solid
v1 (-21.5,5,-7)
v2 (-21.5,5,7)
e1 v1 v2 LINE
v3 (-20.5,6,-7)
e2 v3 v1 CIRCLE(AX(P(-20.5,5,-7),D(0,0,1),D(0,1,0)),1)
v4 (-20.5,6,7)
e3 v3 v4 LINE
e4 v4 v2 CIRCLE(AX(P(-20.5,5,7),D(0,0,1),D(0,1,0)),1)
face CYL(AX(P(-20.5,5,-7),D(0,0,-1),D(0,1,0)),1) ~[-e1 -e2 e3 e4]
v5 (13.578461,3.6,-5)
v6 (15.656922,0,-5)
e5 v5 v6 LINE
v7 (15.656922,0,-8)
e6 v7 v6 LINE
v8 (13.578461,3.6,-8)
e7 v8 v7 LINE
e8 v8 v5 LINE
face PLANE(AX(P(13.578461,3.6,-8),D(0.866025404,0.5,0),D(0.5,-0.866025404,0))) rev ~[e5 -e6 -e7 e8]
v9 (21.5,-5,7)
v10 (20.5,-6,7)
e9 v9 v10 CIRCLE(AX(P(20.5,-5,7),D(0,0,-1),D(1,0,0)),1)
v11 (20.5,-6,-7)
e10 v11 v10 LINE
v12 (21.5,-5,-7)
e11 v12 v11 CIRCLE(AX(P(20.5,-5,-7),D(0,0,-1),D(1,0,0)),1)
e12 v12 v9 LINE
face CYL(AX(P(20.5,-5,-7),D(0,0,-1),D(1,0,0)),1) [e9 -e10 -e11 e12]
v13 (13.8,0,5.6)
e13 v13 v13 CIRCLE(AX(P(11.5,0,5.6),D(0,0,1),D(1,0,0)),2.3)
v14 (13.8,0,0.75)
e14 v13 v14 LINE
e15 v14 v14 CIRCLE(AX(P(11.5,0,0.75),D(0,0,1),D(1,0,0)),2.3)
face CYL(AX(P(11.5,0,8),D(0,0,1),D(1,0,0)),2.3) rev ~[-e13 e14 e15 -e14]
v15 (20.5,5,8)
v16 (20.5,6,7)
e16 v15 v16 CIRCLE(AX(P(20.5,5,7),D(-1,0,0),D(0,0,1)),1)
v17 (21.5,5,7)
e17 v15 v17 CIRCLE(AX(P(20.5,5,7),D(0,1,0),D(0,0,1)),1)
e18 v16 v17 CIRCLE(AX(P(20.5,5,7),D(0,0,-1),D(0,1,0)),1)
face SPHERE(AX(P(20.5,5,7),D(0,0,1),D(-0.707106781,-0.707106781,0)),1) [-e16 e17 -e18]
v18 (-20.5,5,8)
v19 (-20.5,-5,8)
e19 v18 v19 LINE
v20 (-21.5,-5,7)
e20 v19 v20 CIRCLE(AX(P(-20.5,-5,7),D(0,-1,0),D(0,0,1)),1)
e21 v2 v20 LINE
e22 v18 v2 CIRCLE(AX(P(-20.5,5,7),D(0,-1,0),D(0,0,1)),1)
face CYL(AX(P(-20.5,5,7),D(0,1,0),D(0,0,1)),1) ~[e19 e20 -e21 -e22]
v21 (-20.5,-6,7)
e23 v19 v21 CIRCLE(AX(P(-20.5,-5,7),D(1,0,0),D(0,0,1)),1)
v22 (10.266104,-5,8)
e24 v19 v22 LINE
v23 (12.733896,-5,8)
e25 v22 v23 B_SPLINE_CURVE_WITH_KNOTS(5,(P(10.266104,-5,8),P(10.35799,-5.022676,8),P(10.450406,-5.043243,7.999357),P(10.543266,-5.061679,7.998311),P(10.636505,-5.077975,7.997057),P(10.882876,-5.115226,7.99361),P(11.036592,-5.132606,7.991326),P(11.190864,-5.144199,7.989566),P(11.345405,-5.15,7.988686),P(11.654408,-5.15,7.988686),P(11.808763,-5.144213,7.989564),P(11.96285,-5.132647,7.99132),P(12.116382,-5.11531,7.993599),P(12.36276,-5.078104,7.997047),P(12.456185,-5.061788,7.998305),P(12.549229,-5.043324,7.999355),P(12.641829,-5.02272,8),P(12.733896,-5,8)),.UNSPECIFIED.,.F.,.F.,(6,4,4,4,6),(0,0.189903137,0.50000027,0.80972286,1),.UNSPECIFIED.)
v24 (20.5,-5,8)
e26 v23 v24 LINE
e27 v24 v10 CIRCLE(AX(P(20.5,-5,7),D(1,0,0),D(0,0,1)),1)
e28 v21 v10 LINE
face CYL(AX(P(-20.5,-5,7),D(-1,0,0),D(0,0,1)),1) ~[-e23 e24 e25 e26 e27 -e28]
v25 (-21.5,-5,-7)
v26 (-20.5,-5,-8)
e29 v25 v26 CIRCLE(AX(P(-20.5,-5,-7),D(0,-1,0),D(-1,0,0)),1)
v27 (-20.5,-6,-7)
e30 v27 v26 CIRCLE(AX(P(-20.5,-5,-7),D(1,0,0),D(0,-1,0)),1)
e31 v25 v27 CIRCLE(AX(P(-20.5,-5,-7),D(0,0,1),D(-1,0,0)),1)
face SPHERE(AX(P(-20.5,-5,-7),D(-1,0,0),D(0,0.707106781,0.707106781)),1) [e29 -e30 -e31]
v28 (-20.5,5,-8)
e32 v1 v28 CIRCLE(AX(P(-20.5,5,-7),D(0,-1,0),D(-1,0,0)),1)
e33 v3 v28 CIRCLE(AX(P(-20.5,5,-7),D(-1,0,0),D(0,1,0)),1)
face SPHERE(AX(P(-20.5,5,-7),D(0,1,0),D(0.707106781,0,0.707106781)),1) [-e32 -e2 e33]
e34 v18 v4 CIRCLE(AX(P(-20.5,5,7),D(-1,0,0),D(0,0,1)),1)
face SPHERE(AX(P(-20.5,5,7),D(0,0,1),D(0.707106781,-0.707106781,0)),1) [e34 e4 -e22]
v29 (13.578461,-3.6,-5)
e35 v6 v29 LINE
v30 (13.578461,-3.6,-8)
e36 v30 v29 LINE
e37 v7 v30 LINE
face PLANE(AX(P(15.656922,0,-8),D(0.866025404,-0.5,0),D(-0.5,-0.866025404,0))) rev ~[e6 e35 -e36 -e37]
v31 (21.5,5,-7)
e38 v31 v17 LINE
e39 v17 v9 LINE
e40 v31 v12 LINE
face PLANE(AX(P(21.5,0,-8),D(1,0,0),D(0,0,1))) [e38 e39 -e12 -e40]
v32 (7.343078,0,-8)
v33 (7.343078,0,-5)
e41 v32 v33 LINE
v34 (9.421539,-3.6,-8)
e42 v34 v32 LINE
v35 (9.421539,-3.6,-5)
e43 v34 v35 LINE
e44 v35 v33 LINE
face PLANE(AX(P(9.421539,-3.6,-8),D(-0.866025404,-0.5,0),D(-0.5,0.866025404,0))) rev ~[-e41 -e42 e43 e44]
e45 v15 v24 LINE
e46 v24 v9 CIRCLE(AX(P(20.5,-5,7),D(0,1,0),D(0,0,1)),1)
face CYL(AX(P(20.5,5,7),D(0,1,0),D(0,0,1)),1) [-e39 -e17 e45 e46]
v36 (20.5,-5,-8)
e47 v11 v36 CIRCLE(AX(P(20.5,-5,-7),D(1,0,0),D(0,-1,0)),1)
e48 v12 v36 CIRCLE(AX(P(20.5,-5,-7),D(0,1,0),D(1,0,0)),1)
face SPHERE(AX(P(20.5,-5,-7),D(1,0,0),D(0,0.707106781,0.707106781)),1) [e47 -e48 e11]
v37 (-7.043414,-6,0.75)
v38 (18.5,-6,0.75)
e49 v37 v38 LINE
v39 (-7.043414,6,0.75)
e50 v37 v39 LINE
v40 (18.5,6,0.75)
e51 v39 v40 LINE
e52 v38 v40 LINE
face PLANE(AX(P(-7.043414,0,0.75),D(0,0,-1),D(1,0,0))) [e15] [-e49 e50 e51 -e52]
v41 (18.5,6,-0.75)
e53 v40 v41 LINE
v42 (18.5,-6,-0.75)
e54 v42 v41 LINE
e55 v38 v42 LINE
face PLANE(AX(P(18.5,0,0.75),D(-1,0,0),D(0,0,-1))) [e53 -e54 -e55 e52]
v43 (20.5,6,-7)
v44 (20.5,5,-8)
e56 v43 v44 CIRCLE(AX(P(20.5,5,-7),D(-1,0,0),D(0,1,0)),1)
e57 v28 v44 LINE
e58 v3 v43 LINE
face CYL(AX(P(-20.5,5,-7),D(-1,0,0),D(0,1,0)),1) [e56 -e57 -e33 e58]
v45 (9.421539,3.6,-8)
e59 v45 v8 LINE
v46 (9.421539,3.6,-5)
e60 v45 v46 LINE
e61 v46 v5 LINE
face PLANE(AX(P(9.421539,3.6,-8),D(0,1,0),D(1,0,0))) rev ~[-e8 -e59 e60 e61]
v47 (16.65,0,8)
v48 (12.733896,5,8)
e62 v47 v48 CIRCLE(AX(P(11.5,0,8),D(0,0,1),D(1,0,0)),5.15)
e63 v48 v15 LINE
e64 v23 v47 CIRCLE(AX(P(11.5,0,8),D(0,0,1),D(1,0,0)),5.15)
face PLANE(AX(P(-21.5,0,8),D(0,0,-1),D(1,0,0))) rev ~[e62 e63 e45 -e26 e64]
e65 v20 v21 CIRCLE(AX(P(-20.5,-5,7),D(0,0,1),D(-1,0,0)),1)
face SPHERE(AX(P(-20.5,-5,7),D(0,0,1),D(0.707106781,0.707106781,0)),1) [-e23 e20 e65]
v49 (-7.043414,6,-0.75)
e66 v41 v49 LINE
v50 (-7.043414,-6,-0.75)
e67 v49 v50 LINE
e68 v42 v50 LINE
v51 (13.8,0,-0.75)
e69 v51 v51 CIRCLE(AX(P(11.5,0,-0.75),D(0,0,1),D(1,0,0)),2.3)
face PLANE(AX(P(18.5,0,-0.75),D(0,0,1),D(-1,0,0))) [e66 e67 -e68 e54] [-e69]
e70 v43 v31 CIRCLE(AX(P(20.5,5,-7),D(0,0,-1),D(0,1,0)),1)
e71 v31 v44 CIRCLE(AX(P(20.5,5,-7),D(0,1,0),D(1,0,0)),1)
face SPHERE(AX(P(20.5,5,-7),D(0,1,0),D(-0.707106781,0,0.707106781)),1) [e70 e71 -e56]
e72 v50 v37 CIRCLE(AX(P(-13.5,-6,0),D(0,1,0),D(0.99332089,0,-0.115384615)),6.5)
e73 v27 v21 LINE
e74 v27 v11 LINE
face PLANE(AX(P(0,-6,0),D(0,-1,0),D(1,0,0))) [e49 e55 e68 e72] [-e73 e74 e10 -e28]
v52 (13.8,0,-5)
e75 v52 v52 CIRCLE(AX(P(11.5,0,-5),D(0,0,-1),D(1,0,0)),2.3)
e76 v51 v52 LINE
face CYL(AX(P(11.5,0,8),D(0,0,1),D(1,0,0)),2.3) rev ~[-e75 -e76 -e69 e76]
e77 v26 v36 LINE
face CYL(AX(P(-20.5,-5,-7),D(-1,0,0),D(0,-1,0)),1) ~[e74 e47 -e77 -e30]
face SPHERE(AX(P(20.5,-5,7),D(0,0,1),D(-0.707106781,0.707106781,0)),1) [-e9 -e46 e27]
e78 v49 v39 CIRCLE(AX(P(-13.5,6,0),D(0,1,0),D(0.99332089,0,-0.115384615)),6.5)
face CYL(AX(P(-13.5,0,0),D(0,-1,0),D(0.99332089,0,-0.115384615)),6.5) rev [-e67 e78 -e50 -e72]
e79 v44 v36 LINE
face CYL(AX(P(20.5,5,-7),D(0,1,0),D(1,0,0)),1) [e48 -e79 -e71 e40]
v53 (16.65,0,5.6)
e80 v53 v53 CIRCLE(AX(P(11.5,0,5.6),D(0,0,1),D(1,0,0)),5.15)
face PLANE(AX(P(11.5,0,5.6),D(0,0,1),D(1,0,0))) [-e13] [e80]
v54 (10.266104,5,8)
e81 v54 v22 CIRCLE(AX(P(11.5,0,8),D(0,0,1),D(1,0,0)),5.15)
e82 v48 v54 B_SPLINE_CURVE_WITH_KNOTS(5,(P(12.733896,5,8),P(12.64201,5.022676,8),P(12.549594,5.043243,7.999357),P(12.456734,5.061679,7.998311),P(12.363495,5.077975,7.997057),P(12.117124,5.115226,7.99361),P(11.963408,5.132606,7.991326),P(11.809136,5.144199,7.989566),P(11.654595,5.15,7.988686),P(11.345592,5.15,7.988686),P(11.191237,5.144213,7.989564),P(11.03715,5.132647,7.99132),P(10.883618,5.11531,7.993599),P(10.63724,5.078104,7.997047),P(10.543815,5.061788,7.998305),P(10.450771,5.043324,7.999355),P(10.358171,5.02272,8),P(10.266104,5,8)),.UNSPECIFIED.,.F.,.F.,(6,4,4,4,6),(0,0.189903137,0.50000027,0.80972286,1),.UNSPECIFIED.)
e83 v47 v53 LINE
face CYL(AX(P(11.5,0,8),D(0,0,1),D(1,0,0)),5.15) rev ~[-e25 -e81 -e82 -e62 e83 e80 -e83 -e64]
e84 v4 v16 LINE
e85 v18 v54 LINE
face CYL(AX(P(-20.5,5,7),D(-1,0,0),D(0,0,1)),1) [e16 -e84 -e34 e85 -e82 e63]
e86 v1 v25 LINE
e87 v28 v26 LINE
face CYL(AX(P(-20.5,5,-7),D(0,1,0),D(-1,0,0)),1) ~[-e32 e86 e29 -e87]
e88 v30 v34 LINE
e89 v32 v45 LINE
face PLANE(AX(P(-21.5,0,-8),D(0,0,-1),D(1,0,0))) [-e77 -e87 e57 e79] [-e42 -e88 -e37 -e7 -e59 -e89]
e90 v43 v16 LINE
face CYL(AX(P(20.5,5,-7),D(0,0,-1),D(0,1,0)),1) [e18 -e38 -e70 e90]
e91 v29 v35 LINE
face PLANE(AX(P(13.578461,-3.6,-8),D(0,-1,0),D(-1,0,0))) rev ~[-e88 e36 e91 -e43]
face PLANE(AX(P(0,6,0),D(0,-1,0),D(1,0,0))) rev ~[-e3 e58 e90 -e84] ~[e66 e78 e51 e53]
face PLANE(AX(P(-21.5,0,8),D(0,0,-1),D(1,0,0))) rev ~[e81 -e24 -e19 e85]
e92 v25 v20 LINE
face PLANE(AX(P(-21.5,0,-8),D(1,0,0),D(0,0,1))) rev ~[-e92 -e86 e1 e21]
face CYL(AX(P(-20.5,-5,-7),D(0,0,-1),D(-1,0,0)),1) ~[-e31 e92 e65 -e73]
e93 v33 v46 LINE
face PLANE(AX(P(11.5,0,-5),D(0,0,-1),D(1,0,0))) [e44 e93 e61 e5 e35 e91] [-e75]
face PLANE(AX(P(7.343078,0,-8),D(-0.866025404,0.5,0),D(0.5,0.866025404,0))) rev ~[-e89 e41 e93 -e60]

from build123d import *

# Parameters (mm, degrees)
F0_W         = 43
F0_H         = 16
F1_DEPTH     = 6
F2_R         = 2.3
F3_DEPTH     = 16
F2_R_2       = 5.15
F4_DEPTH     = 2.4
F5_R         = 2.3
F6_DEPTH     = 3
F7_T1_DEPTH  = 10
F7_T3_DEPTH  = 41
F7_T5_DEPTH  = 14
F7_S9_W      = 1
F7_S9_H      = 1
F7_T10_DEPTH = 1
F7_S15_W     = 1
F7_S15_H     = 1
F7_T16_DEPTH = 1
F7_S21_W     = 1
F7_S21_H     = 1
F7_T22_DEPTH = 1
F7_S27_W     = 1
F7_S27_H     = 1
F7_T28_DEPTH = 1
F7_S33_W     = 1
F7_S33_H     = 1
F7_T34_DEPTH = 1
F7_S39_W     = 1
F7_S39_H     = 1
F7_T40_DEPTH = 1
F7_S45_W     = 1
F7_S45_H     = 1
F7_T46_DEPTH = 1
F7_S51_W     = 1
F7_S51_H     = 1
F7_T52_DEPTH = 1


# Not quite as in the source:
# - a fillet or chamfer that OpenCascade refuses, or shapes differently, is made with other operations: its cross-section is extruded or revolved along the edge and cut away or added


with BuildPart() as f1:
    # F0 (on Front) → F1 (new body, symmetric)
    with BuildSketch(Plane.XZ):
        Rectangle(F0_W, F0_H)
        with BuildLine():
            ThreePointArc((-7.0434142149, -0.75), (-20, 0), (-7.0434142149, 0.75))
            Line((-7.0434142149, 0.75), (18.5, 0.75))
            Line((18.5, 0.75), (18.5, -0.75))
            Line((18.5, -0.75), (-7.0434142149, -0.75))
        make_face(mode=Mode.SUBTRACT)
    extrude(amount=F1_DEPTH, both=True)

    # F2 (on face) → F3 (cut, through all)
    with BuildSketch(Plane.XY.offset(8)):
        with Locations((11.5, 0)):
            Circle(F2_R)
    extrude(amount=-F3_DEPTH, mode=Mode.SUBTRACT)

    # F2 (on face) → F4 (cut)
    with BuildSketch(Plane.XY.offset(8)):
        with Locations((11.5, 0)):
            Circle(F2_R_2)
        with Locations((11.5, 0)):
            Circle(F2_R, mode=Mode.SUBTRACT)
    extrude(amount=-F4_DEPTH, mode=Mode.SUBTRACT)

    # F5 (on face) → F6 (cut)
    with BuildSketch(Plane(origin=(0, 0, -8), x_dir=(1, 0, 0), z_dir=(0, 0, -1))):
        Polygon((13.5784609691, 3.6), (9.4215390309, 3.6), (7.3430780618, 0), (9.4215390309, -3.6), (13.5784609691, -3.6), (15.6569219382, 0), align=None)
        with Locations((11.5, 0)):
            Circle(F5_R, mode=Mode.SUBTRACT)
    extrude(amount=-F6_DEPTH, mode=Mode.SUBTRACT)

    # F7: fillet of radius 1 on 12 edges, made by hand

    # F7_s2 → F7_t1 (cut)
    with BuildSketch(Plane.XZ.offset(-5)):
        with BuildLine():
            ThreePointArc((-21.5, -7), (-21.2071067812, -7.7071067812), (-20.5, -8))
            Line((-20.5, -8), (-21.5, -8))
            Line((-21.5, -8), (-21.5, -7))
        make_face()
        with BuildLine():
            ThreePointArc((21.5, -7), (21.2071067812, -7.7071067812), (20.5, -8))
            Line((20.5, -8), (21.5, -8))
            Line((21.5, -8), (21.5, -7))
        make_face()
        with BuildLine():
            ThreePointArc((-20.5, 8), (-21.2071067812, 7.7071067812), (-21.5, 7))
            Line((-21.5, 7), (-21.5, 8))
            Line((-21.5, 8), (-20.5, 8))
        make_face()
        with BuildLine():
            ThreePointArc((20.5, 8), (21.2071067812, 7.7071067812), (21.5, 7))
            Line((21.5, 7), (21.5, 8))
            Line((21.5, 8), (20.5, 8))
        make_face()
    extrude(amount=F7_T1_DEPTH, mode=Mode.SUBTRACT)

    # F7_s4 → F7_t3 (cut)
    with BuildSketch(Plane.YZ.offset(-20.5)):
        with BuildLine():
            ThreePointArc((-6, -7), (-5.7071067812, -7.7071067812), (-5, -8))
            Line((-5, -8), (-6, -8))
            Line((-6, -8), (-6, -7))
        make_face()
        with BuildLine():
            ThreePointArc((6, -7), (5.7071067812, -7.7071067812), (5, -8))
            Line((5, -8), (6, -8))
            Line((6, -8), (6, -7))
        make_face()
        with BuildLine():
            ThreePointArc((-5, 8), (-5.7071067812, 7.7071067812), (-6, 7))
            Line((-6, 7), (-6, 8))
            Line((-6, 8), (-5, 8))
        make_face()
        with BuildLine():
            ThreePointArc((5, 8), (5.7071067812, 7.7071067812), (6, 7))
            Line((6, 7), (6, 8))
            Line((6, 8), (5, 8))
        make_face()
    extrude(amount=F7_T3_DEPTH, mode=Mode.SUBTRACT)

    # F7_s6 → F7_t5 (cut)
    with BuildSketch(Plane.XY.offset(-7)):
        with BuildLine():
            ThreePointArc((20.5, 6), (21.2071067812, 5.7071067812), (21.5, 5))
            Line((21.5, 5), (21.5, 6))
            Line((21.5, 6), (20.5, 6))
        make_face()
        with BuildLine():
            ThreePointArc((21.5, -5), (21.2071067812, -5.7071067812), (20.5, -6))
            Line((20.5, -6), (21.5, -6))
            Line((21.5, -6), (21.5, -5))
        make_face()
        with BuildLine():
            ThreePointArc((-20.5, 6), (-21.2071067812, 5.7071067812), (-21.5, 5))
            Line((-21.5, 5), (-21.5, 6))
            Line((-21.5, 6), (-20.5, 6))
        make_face()
        with BuildLine():
            ThreePointArc((-21.5, -5), (-21.2071067812, -5.7071067812), (-20.5, -6))
            Line((-20.5, -6), (-21.5, -6))
            Line((-21.5, -6), (-21.5, -5))
        make_face()
    extrude(amount=F7_T5_DEPTH, mode=Mode.SUBTRACT)


with BuildPart() as f7_tool8:
    # F7_s9 → F7_t10 (new body)
    with BuildSketch(Plane.XZ.offset(-5)):
        with Locations((-21, -7.5)):
            Rectangle(F7_S9_W, F7_S9_H)
    extrude(amount=-F7_T10_DEPTH)

    # F7_s11 → F7_t12 (revolve, cut)
    with BuildSketch(Plane(origin=(-20.5, 5, -7), x_dir=(0.7071067812, 0, 0.7071067812), z_dir=(-0.7071067812, 0, 0.7071067812))):
        with BuildLine():
            ThreePointArc((0, -1), (1, 0), (0, 1))
            Line((0, 1), (0, -1))
        make_face()
    revolve(axis=Axis((-20.5, 5, -7), (0, 1, 0)), mode=Mode.SUBTRACT)


with BuildPart() as f1_1:
    add(f1.part)

    # F7_t7: cut F7_tool8
    add(f7_tool8.part, mode=Mode.SUBTRACT)


with BuildPart() as f7_tool14:
    # F7_s15 → F7_t16 (new body)
    with BuildSketch(Plane.YZ.offset(-20.5)):
        with Locations((-5.5, -7.5)):
            Rectangle(F7_S15_W, F7_S15_H)
    extrude(amount=-F7_T16_DEPTH)

    # F7_s17 → F7_t18 (revolve, cut)
    with BuildSketch(Plane(origin=(-20.5, -5, -7), x_dir=(0, 0.7071067812, 0.7071067812), z_dir=(0, -0.7071067812, 0.7071067812))):
        with BuildLine():
            ThreePointArc((0, -1), (1, 0), (0, 1))
            Line((0, 1), (0, -1))
        make_face()
    revolve(axis=Axis((-20.5, -5, -7), (-1, 0, 0)), mode=Mode.SUBTRACT)


with BuildPart() as f1_2:
    add(f1_1.part)

    # F7_t13: cut F7_tool14
    add(f7_tool14.part, mode=Mode.SUBTRACT)


with BuildPart() as f7_tool20:
    # F7_s21 → F7_t22 (new body)
    with BuildSketch(Plane.YZ.offset(20.5)):
        with Locations((-5.5, -7.5)):
            Rectangle(F7_S21_W, F7_S21_H)
    extrude(amount=F7_T22_DEPTH)

    # F7_s23 → F7_t24 (revolve, cut)
    with BuildSketch(Plane(origin=(20.5, -5, -7), x_dir=(0, 0.7071067812, 0.7071067812), z_dir=(0, 0.7071067812, -0.7071067812))):
        with BuildLine():
            ThreePointArc((0, -1), (1, 0), (0, 1))
            Line((0, 1), (0, -1))
        make_face()
    revolve(axis=Axis((20.5, -5, -7), (1, 0, 0)), mode=Mode.SUBTRACT)


with BuildPart() as f1_3:
    add(f1_2.part)

    # F7_t19: cut F7_tool20
    add(f7_tool20.part, mode=Mode.SUBTRACT)


with BuildPart() as f7_tool26:
    # F7_s27 → F7_t28 (new body)
    with BuildSketch(Plane.XZ.offset(-5)):
        with Locations((21, -7.5)):
            Rectangle(F7_S27_W, F7_S27_H)
    extrude(amount=-F7_T28_DEPTH)

    # F7_s29 → F7_t30 (revolve, cut)
    with BuildSketch(Plane(origin=(20.5, 5, -7), x_dir=(-0.7071067812, 0, 0.7071067812), z_dir=(-0.7071067812, 0, -0.7071067812))):
        with BuildLine():
            ThreePointArc((0, -1), (1, 0), (0, 1))
            Line((0, 1), (0, -1))
        make_face()
    revolve(axis=Axis((20.5, 5, -7), (0, 1, 0)), mode=Mode.SUBTRACT)


with BuildPart() as f1_4:
    add(f1_3.part)

    # F7_t25: cut F7_tool26
    add(f7_tool26.part, mode=Mode.SUBTRACT)


with BuildPart() as f7_tool32:
    # F7_s33 → F7_t34 (new body)
    with BuildSketch(Plane.XY.offset(7)):
        with Locations((21, 5.5)):
            Rectangle(F7_S33_W, F7_S33_H)
    extrude(amount=F7_T34_DEPTH)

    # F7_s35 → F7_t36 (revolve, cut)
    with BuildSketch(Plane(origin=(20.5, 5, 7), x_dir=(-0.7071067812, -0.7071067812, 0), z_dir=(-0.7071067812, 0.7071067812, 0))):
        with BuildLine():
            ThreePointArc((0, -1), (1, 0), (0, 1))
            Line((0, 1), (0, -1))
        make_face()
    revolve(axis=Axis((20.5, 5, 7), (0, 0, 1)), mode=Mode.SUBTRACT)


with BuildPart() as f1_5:
    add(f1_4.part)

    # F7_t31: cut F7_tool32
    add(f7_tool32.part, mode=Mode.SUBTRACT)


with BuildPart() as f7_tool38:
    # F7_s39 → F7_t40 (new body)
    with BuildSketch(Plane.XY.offset(7)):
        with Locations((21, -5.5)):
            Rectangle(F7_S39_W, F7_S39_H)
    extrude(amount=F7_T40_DEPTH)

    # F7_s41 → F7_t42 (revolve, cut)
    with BuildSketch(Plane(origin=(20.5, -5, 7), x_dir=(-0.7071067812, 0.7071067812, 0), z_dir=(0.7071067812, 0.7071067812, 0))):
        with BuildLine():
            ThreePointArc((0, -1), (1, 0), (0, 1))
            Line((0, 1), (0, -1))
        make_face()
    revolve(axis=Axis((20.5, -5, 7), (0, 0, 1)), mode=Mode.SUBTRACT)


with BuildPart() as f1_6:
    add(f1_5.part)

    # F7_t37: cut F7_tool38
    add(f7_tool38.part, mode=Mode.SUBTRACT)


with BuildPart() as f7_tool44:
    # F7_s45 → F7_t46 (new body)
    with BuildSketch(Plane.XY.offset(7)):
        with Locations((-21, 5.5)):
            Rectangle(F7_S45_W, F7_S45_H)
    extrude(amount=F7_T46_DEPTH)

    # F7_s47 → F7_t48 (revolve, cut)
    with BuildSketch(Plane(origin=(-20.5, 5, 7), x_dir=(0.7071067812, -0.7071067812, 0), z_dir=(-0.7071067812, -0.7071067812, 0))):
        with BuildLine():
            ThreePointArc((0, -1), (1, 0), (0, 1))
            Line((0, 1), (0, -1))
        make_face()
    revolve(axis=Axis((-20.5, 5, 7), (0, 0, 1)), mode=Mode.SUBTRACT)


with BuildPart() as f1_7:
    add(f1_6.part)

    # F7_t43: cut F7_tool44
    add(f7_tool44.part, mode=Mode.SUBTRACT)


with BuildPart() as f7_tool50:
    # F7_s51 → F7_t52 (new body)
    with BuildSketch(Plane.XY.offset(7)):
        with Locations((-21, -5.5)):
            Rectangle(F7_S51_W, F7_S51_H)
    extrude(amount=F7_T52_DEPTH)

    # F7_s53 → F7_t54 (revolve, cut)
    with BuildSketch(Plane(origin=(-20.5, -5, 7), x_dir=(0.7071067812, 0.7071067812, 0), z_dir=(0.7071067812, -0.7071067812, 0))):
        with BuildLine():
            ThreePointArc((0, -1), (1, 0), (0, 1))
            Line((0, 1), (0, -1))
        make_face()
    revolve(axis=Axis((-20.5, -5, 7), (0, 0, 1)), mode=Mode.SUBTRACT)


with BuildPart() as f1_8:
    add(f1_7.part)

    # F7_t49: cut F7_tool50
    add(f7_tool50.part, mode=Mode.SUBTRACT)


solid = f1_8.part
